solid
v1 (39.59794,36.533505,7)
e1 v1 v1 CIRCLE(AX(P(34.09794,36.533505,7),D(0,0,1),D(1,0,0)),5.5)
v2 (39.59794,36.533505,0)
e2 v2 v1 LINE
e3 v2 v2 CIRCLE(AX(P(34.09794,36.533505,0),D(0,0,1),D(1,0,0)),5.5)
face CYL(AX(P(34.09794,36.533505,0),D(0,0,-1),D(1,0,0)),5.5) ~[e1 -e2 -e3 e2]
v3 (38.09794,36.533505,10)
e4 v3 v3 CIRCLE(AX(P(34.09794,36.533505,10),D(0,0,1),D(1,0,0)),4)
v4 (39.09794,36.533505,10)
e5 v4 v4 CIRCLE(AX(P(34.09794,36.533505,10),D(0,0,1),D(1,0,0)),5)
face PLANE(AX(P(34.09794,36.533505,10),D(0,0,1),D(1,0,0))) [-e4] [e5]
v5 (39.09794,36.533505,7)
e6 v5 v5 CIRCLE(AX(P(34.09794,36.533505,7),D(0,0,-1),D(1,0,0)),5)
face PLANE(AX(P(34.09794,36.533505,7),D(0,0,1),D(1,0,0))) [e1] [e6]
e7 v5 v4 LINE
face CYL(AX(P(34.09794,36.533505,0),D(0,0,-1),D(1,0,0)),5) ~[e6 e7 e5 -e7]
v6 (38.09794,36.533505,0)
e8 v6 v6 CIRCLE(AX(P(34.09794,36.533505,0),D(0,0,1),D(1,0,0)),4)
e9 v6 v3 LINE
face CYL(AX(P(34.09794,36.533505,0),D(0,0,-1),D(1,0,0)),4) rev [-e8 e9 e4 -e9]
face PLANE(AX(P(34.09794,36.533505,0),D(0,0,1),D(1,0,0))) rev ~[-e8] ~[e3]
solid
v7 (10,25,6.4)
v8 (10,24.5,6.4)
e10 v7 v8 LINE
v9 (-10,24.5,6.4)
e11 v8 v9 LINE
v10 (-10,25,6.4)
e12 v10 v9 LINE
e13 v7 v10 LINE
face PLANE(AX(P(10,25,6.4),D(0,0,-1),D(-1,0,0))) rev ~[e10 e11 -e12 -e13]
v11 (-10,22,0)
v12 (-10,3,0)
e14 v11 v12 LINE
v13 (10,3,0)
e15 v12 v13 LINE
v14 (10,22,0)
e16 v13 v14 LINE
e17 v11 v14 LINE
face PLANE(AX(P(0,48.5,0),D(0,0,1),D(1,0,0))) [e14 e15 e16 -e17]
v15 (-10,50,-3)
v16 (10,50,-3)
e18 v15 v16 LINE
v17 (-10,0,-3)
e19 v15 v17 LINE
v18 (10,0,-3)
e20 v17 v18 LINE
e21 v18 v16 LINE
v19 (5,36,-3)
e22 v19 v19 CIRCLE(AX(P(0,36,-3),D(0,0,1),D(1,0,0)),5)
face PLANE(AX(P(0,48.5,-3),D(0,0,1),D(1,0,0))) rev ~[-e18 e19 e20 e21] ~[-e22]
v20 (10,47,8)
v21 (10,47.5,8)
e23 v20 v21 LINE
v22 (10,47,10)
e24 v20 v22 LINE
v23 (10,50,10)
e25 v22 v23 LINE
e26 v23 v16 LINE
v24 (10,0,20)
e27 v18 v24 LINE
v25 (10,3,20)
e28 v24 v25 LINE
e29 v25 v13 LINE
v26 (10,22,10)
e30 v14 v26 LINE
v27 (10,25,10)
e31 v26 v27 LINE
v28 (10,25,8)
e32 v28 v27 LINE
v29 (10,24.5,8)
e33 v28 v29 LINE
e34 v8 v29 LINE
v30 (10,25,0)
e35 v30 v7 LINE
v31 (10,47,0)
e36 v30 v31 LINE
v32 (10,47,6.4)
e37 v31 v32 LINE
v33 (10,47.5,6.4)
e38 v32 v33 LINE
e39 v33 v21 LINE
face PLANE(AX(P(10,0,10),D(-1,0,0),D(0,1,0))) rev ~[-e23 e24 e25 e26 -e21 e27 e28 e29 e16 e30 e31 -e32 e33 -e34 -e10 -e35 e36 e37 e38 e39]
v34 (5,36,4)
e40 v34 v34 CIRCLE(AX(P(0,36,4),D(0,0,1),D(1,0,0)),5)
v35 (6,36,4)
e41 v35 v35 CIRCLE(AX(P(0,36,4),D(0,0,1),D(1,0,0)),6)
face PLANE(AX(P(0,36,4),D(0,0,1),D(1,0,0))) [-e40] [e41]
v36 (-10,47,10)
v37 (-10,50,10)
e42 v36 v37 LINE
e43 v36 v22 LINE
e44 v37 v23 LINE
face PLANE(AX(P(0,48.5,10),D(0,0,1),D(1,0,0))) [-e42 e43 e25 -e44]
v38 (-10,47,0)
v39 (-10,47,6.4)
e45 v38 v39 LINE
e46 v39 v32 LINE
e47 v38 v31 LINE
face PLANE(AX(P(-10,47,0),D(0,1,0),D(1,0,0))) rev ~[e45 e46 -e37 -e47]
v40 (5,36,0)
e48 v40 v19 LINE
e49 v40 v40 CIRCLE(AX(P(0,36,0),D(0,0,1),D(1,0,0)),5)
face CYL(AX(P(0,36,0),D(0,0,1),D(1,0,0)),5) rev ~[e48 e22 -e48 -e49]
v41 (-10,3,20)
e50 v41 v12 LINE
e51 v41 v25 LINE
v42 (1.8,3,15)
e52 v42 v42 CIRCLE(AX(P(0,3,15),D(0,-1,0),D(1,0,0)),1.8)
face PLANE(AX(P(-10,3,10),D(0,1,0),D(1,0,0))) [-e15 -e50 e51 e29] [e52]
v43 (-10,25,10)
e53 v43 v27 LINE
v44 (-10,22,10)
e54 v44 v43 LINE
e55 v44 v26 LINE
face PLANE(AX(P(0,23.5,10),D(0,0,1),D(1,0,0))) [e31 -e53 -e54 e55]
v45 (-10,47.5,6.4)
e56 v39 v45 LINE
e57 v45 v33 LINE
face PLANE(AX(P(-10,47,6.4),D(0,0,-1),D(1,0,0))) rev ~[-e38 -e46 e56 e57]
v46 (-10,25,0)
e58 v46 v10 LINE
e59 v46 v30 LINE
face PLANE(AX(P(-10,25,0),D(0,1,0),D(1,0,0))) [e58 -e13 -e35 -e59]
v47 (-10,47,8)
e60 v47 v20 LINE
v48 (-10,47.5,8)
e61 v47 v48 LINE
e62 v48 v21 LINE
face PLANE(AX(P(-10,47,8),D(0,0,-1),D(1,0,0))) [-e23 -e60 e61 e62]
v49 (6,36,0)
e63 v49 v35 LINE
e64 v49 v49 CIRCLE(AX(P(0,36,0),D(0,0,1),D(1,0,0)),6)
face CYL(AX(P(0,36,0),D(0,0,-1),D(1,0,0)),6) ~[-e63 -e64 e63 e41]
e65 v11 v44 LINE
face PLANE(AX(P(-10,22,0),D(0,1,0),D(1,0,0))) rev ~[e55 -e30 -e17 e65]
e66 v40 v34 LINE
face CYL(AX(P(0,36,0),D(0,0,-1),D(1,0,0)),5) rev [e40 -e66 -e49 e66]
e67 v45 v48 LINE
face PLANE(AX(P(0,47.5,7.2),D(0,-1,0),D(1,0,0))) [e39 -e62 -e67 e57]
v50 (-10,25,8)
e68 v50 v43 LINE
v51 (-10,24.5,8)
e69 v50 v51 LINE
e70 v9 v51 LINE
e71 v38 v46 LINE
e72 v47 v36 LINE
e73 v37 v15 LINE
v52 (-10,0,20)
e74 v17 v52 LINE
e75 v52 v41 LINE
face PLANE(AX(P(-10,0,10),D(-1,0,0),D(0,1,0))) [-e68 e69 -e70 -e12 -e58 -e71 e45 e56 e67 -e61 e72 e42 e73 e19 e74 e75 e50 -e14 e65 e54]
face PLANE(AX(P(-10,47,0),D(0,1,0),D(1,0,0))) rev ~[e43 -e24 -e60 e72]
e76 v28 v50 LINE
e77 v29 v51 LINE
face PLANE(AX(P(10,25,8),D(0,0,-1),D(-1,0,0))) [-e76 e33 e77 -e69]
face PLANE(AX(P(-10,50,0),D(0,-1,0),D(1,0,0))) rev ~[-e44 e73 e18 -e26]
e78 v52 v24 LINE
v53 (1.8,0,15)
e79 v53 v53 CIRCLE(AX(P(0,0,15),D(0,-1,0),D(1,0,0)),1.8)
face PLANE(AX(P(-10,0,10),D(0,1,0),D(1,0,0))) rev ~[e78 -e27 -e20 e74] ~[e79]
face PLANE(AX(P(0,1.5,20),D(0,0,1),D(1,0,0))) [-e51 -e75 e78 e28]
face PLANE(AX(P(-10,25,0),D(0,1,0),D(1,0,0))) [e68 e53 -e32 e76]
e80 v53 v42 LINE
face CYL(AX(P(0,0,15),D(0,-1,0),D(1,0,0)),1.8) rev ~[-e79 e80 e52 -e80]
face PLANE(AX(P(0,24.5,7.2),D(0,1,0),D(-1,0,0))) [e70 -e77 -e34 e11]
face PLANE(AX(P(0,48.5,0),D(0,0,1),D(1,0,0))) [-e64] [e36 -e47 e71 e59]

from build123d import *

# Parameters (mm, degrees)
F0_W      = 20
F0_H      = 3
F1_DEPTH  = 10
F0_R      = 6
F0_R_2    = 5
F2_DEPTH  = 4
F0_H_2    = 22
F0_H_3    = 19
F3_DEPTH  = 3
F4_W      = 20
F4_H      = 1.6
F5_DEPTH  = 0.5
F6_W      = 20
F6_H      = 1.6
F7_DEPTH  = 0.5
F8_DEPTH  = 10
F9_R      = 1.8
F10_DEPTH = 50.001
F11_R     = 5
F11_R_2   = 4
F12_DEPTH = 10
F11_R_3   = 5.5
F15_DEPTH = 7
F16_DEPTH = 10


# Not quite as in the source:
# - a feature names something its author has since deleted; it is built from what else it names
# - the program builds the solid bodies; features that only make, move or delete a surface that nothing else refers to are left out


with BuildPart() as f1:
    # F0 (on Top) → F1 (new body)
    with BuildSketch(Plane.XY):
        with Locations((0, 1.5)):
            Rectangle(F0_W, F0_H)
    extrude(amount=F1_DEPTH)



with BuildPart() as f1b:
    # F0 (on Top) → F1, piece 2 (new body)
    with BuildSketch(Plane.XY):
        with Locations((0, 23.5)):
            Rectangle(F0_W, F0_H)
    extrude(amount=F1_DEPTH)


with BuildPart() as f1c:
    # F0 (on Top) → F1, piece 3 (new body)
    with BuildSketch(Plane.XY):
        with Locations((0, 48.5)):
            Rectangle(F0_W, F0_H)
    extrude(amount=F1_DEPTH)


with BuildPart() as f2:
    # F0 (on Top) → F2 (new body)
    with BuildSketch(Plane.XY):
        with Locations((0, 36)):
            Circle(F0_R)
        with Locations((0, 36)):
            Circle(F0_R_2, mode=Mode.SUBTRACT)
    extrude(amount=F2_DEPTH)


with BuildPart() as f1_1:
    add(f1.part)

    add(f1b.part)  # F3 merges F1b

    add(f1c.part)  # F3 merges F1c

    add(f2.part)  # F3 merges F2
    # F0 (on Top) → F3 (join)
    with BuildSketch(Plane.XY):
        with Locations((0, 48.5)):
            Rectangle(F0_W, F0_H)
        with Locations((0, 36)):
            Rectangle(F0_W, F0_H_2)
        with Locations((0, 36)):
            Circle(F0_R, mode=Mode.SUBTRACT)
        with Locations((0, 36)):
            Circle(F0_R)
        with Locations((0, 36)):
            Circle(F0_R_2, mode=Mode.SUBTRACT)
        with Locations((0, 23.5)):
            Rectangle(F0_W, F0_H)
        with Locations((0, 12.5)):
            Rectangle(F0_W, F0_H_3)
        with Locations((0, 1.5)):
            Rectangle(F0_W, F0_H)
    extrude(amount=-F3_DEPTH)

    # F4 (on face) → F5 (cut)
    with BuildSketch(Plane.XZ.offset(-47)):
        with Locations((0, 7.2)):
            Rectangle(F4_W, F4_H)
    extrude(amount=-F5_DEPTH, mode=Mode.SUBTRACT)

    # F6 (on face) → F7 (cut)
    with BuildSketch(Plane(origin=(0, 25, 0), x_dir=(-1, 0, 0), z_dir=(0, 1, 0))):
        with Locations((0, 7.2)):
            Rectangle(F6_W, F6_H)
    extrude(amount=-F7_DEPTH, mode=Mode.SUBTRACT)

    # F8 (add): a face of the model
    f8_faces = [f1_1.faces().sort_by_distance(p)[0] for p in [
        (0, 1.5, 10),
    ]]
    extrude(f8_faces, amount=F8_DEPTH)

    # F9 (on Front) → F10 (cut, through all)
    with BuildSketch(Plane.XZ):
        with Locations((0, 15)):
            Circle(F9_R)
    extrude(amount=-F10_DEPTH, mode=Mode.SUBTRACT)


with BuildPart() as f12:
    # F11 (on Top) → F12 (new body)
    with BuildSketch(Plane.XY):
        with Locations((34.0979397297, 36.5335047245)):
            Circle(F11_R)
        with Locations((34.0979397297, 36.5335047245)):
            Circle(F11_R_2, mode=Mode.SUBTRACT)
    extrude(amount=F12_DEPTH)


with BuildPart() as f15:
    # F11 (on Top) → F15 (new body)
    with BuildSketch(Plane.XY):
        with Locations((34.0979397297, 36.5335047245)):
            Circle(F11_R_3)
        with Locations((34.0979397297, 36.5335047245)):
            Circle(F11_R, mode=Mode.SUBTRACT)
        with Locations((34.0979397297, 36.5335047245)):
            Circle(F11_R)
        with Locations((34.0979397297, 36.5335047245)):
            Circle(F11_R_2, mode=Mode.SUBTRACT)
    extrude(amount=F15_DEPTH)

    # F11 (on Top) → F16 (join)
    with BuildSketch(Plane.XY):
        with Locations((34.0979397297, 36.5335047245)):
            Circle(F11_R)
        with Locations((34.0979397297, 36.5335047245)):
            Circle(F11_R_2, mode=Mode.SUBTRACT)
    extrude(amount=F16_DEPTH)


solid = Compound([f1_1.part, f15.part])
